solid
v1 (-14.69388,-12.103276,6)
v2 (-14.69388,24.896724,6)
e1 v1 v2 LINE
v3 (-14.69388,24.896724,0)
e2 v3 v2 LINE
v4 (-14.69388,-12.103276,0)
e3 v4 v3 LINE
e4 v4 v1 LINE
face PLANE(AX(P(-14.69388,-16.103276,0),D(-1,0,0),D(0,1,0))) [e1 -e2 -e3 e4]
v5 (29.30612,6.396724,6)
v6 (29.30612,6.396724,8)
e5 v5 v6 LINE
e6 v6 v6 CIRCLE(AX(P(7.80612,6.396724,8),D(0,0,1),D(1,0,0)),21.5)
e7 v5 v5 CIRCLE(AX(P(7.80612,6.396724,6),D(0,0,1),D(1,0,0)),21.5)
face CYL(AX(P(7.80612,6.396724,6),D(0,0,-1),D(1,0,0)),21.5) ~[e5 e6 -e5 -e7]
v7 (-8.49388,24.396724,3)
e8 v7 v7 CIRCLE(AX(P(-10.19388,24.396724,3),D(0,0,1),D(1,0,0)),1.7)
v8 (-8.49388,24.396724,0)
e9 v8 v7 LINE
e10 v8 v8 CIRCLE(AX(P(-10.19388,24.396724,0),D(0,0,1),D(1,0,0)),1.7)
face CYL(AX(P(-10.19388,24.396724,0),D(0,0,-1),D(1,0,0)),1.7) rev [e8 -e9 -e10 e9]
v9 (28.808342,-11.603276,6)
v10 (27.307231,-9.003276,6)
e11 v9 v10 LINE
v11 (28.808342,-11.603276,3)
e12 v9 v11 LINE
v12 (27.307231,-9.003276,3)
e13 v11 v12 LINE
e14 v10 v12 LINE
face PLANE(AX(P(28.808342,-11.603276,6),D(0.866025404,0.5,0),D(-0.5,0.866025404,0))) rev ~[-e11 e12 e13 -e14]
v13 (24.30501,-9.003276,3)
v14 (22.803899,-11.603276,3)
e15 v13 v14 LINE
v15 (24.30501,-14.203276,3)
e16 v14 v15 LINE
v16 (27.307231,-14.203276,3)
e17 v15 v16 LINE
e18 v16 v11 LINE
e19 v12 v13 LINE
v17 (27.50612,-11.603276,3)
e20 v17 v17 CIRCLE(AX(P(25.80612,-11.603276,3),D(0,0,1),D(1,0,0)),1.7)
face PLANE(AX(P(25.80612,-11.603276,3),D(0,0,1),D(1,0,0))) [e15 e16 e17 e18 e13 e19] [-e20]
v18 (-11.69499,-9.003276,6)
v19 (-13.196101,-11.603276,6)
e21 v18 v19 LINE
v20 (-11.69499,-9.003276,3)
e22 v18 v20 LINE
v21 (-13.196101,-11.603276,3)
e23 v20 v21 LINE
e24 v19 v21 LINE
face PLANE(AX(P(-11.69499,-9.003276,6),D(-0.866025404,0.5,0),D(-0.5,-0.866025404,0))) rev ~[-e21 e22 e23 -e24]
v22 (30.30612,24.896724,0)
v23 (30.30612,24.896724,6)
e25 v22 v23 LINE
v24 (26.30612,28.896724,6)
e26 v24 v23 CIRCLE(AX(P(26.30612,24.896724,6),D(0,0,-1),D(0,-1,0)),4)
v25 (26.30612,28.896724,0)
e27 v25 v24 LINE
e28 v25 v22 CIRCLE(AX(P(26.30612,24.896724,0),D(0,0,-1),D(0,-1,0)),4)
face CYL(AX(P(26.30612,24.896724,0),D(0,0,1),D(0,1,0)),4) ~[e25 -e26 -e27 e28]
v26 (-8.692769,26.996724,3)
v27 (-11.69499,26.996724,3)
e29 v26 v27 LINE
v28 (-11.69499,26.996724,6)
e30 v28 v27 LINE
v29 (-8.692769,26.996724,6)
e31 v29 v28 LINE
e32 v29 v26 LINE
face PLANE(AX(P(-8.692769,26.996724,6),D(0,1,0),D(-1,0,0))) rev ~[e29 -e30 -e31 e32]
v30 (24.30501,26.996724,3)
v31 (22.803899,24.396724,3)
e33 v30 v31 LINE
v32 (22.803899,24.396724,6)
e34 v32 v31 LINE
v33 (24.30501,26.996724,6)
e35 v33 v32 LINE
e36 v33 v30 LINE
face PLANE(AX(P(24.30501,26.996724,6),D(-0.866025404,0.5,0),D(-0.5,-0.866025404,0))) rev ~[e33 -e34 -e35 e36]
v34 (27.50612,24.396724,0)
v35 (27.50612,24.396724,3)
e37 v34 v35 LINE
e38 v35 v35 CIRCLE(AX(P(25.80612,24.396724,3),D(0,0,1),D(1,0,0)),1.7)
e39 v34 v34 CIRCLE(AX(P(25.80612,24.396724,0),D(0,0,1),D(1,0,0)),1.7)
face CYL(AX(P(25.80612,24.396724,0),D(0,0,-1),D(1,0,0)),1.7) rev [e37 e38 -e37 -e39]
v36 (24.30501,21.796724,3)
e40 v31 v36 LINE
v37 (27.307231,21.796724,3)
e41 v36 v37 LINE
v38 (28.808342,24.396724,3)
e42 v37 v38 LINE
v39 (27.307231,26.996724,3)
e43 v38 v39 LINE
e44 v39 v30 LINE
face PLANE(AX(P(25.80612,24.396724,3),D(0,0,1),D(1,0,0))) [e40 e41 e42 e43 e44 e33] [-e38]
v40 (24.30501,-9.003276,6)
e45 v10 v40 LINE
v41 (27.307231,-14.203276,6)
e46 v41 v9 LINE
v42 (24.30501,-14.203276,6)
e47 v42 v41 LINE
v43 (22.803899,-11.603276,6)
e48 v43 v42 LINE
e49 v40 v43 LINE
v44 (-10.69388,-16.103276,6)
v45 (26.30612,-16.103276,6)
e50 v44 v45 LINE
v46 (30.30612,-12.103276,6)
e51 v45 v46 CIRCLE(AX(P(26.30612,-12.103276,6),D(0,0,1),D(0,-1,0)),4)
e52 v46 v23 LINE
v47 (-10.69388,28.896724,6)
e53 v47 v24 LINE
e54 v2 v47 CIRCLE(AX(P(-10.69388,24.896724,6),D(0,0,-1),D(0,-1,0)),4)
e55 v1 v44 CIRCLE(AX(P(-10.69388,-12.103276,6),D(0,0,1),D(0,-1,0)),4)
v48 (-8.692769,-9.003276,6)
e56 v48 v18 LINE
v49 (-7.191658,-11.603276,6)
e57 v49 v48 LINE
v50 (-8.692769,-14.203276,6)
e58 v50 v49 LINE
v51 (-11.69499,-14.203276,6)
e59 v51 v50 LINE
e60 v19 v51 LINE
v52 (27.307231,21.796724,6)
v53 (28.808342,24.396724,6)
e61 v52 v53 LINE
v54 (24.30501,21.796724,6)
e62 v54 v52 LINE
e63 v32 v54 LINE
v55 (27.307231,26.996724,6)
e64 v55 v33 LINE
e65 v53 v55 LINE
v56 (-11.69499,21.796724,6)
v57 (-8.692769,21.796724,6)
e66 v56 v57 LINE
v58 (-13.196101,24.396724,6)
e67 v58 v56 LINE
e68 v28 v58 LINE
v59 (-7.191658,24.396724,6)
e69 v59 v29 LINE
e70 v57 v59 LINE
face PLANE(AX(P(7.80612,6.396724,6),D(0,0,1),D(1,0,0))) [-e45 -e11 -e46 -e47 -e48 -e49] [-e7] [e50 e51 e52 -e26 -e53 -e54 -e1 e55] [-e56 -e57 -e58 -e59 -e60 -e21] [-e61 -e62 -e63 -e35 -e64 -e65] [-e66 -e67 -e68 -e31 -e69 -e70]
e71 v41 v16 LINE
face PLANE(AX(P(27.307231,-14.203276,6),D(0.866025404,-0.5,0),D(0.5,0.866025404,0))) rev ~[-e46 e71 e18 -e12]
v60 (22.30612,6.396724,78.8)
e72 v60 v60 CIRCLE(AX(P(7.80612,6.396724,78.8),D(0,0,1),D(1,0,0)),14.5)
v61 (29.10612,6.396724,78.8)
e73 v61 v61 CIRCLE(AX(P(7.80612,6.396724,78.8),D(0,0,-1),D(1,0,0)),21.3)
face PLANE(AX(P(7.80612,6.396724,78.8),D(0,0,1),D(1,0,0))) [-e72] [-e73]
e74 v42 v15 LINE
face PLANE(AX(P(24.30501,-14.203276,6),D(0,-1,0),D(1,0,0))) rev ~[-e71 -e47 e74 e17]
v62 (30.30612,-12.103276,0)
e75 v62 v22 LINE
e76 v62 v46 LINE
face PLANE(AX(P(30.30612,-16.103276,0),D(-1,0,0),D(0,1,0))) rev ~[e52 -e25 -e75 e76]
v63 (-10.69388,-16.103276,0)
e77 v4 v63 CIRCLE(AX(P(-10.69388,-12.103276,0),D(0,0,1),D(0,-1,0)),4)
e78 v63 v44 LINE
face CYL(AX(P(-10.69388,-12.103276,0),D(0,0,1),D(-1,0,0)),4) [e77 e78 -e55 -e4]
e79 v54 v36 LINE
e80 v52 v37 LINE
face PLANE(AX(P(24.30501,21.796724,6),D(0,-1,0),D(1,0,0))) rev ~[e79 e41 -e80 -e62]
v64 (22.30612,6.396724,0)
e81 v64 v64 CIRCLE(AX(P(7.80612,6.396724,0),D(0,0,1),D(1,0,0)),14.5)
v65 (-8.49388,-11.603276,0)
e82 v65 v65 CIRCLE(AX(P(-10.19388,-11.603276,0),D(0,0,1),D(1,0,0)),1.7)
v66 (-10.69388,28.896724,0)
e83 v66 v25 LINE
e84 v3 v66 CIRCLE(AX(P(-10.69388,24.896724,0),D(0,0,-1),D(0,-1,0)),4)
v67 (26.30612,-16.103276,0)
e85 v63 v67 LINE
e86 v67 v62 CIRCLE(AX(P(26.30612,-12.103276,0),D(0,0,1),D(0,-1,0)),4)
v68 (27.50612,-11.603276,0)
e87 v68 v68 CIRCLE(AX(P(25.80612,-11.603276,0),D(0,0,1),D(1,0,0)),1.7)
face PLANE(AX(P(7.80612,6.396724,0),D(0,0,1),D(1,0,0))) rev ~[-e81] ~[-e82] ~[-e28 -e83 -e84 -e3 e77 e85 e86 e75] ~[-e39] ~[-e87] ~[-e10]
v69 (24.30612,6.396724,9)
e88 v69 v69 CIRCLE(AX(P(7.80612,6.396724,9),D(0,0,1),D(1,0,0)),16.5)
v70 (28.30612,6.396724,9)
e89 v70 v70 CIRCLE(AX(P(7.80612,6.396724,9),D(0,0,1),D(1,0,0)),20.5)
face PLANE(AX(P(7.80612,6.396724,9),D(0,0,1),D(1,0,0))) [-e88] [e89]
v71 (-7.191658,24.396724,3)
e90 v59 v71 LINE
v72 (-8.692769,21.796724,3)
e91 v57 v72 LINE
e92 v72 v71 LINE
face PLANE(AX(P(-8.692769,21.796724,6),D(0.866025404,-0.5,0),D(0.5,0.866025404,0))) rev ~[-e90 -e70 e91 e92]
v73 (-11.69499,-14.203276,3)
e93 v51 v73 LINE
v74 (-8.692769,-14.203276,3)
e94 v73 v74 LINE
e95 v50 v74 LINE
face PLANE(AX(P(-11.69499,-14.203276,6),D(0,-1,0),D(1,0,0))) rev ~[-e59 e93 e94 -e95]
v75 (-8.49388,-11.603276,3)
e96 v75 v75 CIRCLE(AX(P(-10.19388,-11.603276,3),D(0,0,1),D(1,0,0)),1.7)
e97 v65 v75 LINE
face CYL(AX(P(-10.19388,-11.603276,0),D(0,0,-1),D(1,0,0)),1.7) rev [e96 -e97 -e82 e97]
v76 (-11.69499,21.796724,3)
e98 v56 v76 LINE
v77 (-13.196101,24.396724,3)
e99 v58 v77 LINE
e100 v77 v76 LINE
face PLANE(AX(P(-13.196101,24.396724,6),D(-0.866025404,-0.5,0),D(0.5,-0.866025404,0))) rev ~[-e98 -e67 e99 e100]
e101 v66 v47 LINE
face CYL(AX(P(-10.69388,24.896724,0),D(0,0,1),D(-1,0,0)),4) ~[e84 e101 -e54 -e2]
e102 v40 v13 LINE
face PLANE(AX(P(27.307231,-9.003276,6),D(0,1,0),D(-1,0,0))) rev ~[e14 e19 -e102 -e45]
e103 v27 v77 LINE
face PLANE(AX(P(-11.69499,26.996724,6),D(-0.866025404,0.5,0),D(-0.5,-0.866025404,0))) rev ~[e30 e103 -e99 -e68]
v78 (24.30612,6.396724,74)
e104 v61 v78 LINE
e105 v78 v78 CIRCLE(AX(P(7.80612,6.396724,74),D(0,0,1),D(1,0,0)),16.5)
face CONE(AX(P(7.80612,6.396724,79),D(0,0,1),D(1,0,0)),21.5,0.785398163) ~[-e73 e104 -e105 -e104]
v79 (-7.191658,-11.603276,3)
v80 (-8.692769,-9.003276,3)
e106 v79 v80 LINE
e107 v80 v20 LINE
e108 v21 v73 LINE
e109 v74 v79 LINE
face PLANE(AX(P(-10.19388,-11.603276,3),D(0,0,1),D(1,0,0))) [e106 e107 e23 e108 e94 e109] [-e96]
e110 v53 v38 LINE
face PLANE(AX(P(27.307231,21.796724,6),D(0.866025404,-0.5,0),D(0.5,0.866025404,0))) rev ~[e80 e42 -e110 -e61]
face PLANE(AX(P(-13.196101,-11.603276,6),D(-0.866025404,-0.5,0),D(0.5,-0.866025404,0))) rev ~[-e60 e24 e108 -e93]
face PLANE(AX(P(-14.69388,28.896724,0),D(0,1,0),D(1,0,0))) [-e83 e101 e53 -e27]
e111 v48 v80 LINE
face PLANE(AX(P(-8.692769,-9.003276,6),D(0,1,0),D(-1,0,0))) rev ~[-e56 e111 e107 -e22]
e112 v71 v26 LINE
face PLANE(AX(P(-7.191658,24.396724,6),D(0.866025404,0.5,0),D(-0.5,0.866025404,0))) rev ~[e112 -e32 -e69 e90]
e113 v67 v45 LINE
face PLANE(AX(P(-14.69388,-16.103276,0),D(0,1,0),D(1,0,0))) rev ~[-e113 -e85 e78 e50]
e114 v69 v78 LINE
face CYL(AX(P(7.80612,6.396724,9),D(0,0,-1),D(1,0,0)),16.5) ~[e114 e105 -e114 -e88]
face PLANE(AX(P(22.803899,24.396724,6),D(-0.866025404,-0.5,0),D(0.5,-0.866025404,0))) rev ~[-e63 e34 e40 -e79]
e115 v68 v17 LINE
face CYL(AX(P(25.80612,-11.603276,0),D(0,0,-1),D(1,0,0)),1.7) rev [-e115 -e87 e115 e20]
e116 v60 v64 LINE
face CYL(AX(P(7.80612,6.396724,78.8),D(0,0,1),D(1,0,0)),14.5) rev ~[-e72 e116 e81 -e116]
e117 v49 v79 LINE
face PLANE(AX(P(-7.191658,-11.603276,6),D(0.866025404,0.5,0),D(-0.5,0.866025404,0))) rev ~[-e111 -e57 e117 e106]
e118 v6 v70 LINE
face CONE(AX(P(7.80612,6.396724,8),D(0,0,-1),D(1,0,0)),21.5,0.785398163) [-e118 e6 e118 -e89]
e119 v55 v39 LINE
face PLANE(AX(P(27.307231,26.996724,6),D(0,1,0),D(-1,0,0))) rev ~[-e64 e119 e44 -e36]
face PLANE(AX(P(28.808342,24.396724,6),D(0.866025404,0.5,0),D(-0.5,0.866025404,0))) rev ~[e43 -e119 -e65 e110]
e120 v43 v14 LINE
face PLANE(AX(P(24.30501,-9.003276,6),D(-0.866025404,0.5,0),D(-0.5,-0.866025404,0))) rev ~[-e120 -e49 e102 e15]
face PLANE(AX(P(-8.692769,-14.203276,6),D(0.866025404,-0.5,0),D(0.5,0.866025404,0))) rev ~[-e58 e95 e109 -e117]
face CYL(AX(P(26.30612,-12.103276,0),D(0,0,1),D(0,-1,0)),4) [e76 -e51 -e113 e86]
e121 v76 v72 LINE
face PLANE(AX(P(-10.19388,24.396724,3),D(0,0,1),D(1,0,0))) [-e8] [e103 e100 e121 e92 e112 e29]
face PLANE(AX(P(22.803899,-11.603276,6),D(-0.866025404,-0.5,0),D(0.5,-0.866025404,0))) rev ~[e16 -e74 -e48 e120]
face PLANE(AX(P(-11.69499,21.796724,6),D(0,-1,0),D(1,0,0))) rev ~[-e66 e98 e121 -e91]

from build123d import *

# Parameters (mm, degrees)
F0_W         = 45
F0_H         = 45
F0_R         = 1.7
F1_DEPTH     = 6
F2_R         = 1.7
F3_DEPTH     = 3
F4_R         = 4
F5_R         = 21.5
F6_DEPTH     = 3
F7_SIZE      = 1
F8_R         = 16.5
F9_DEPTH     = 65
F10_R        = 21.5
F11_DEPTH    = 4.8
F12_S5_R     = 16.5
F12_T6_DEPTH = 32
F13_R        = 14.5
F14_DEPTH    = 100


# Not quite as in the source:
# - a fillet or chamfer that OpenCascade refuses, or shapes differently, is made with other operations: its cross-section is extruded or revolved along the edge and cut away or added


with BuildPart() as f1:
    # F0 (on Top) → F1 (new body)
    with BuildSketch(Plane.XY):
        with Locations((7.8061202839, 6.3967237547)):
            Rectangle(F0_W, F0_H)
        with Locations((-10.1938797161, -11.6032762453)):
            Circle(F0_R, mode=Mode.SUBTRACT)
        with Locations((25.8061202839, -11.6032762453)):
            Circle(F0_R, mode=Mode.SUBTRACT)
        with Locations((-10.1938797161, 24.3967237547)):
            Circle(F0_R, mode=Mode.SUBTRACT)
        with Locations((25.8061202839, 24.3967237547)):
            Circle(F0_R, mode=Mode.SUBTRACT)
    extrude(amount=F1_DEPTH)

    # F2 (on face) → F3 (cut)
    with BuildSketch(Plane.XY.offset(6)):
        Polygon((-11.694990416, 21.7967237547), (-8.6927690162, 21.7967237547), (-7.1916583163, 24.3967237547), (-8.6927690162, 26.9967237547), (-11.694990416, 26.9967237547), (-13.1961011159, 24.3967237547), align=None)
        with Locations((-10.1938797161, 24.3967237547)):
            Circle(F2_R, mode=Mode.SUBTRACT)
        Polygon((24.305009584, 21.7967237547), (27.3072309838, 21.7967237547), (28.8083416837, 24.3967237547), (27.3072309838, 26.9967237547), (24.305009584, 26.9967237547), (22.8038988841, 24.3967237547), align=None)
        with Locations((25.8061202839, 24.3967237547)):
            Circle(F2_R, mode=Mode.SUBTRACT)
        Polygon((-8.6927690162, -9.0032762453), (-11.694990416, -9.0032762453), (-13.1961011159, -11.6032762453), (-11.694990416, -14.2032762453), (-8.6927690162, -14.2032762453), (-7.1916583163, -11.6032762453), align=None)
        with Locations((-10.1938797161, -11.6032762453)):
            Circle(F2_R, mode=Mode.SUBTRACT)
        Polygon((27.3072309838, -9.0032762453), (24.305009584, -9.0032762453), (22.8038988841, -11.6032762453), (24.305009584, -14.2032762453), (27.3072309838, -14.2032762453), (28.8083416837, -11.6032762453), align=None)
        with Locations((25.8061202839, -11.6032762453)):
            Circle(F2_R, mode=Mode.SUBTRACT)
    extrude(amount=-F3_DEPTH, mode=Mode.SUBTRACT)

    # F4
    f4_edges = [f1.edges().sort_by_distance(p)[0] for p in [
        (-14.69388, 28.896724, 3),
        (30.30612, 28.896724, 3),
        (30.30612, -16.103276, 3),
        (-14.69388, -16.103276, 3),
    ]]
    fillet(f4_edges, radius=F4_R)

    # F5 (on face) → F6 (join)
    with BuildSketch(Plane.XY.offset(6)):
        with Locations((7.8061202839, 6.3967237547)):
            Circle(F5_R)
    extrude(amount=F6_DEPTH)

    # F7
    f7_edges = [f1.edges().sort_by_distance(p)[0] for p in [
        (-13.69388, 6.396724, 9),
    ]]
    chamfer(f7_edges, length=F7_SIZE)

    # F8 (on face) → F9 (join)
    with BuildSketch(Plane.XY.offset(9)):
        with Locations((7.8061202839, 6.3967237547)):
            Circle(F8_R)
    extrude(amount=F9_DEPTH)

    # F10 (on face) → F11 (join)
    with BuildSketch(Plane.XY.offset(74)):
        with Locations((7.8061202839, 6.3967237547)):
            Circle(F10_R)
    extrude(amount=F11_DEPTH)

    # F12: chamfer of 5 on 1 edges, made by hand


with BuildPart() as f12_tool2:
    # F12_s3 → F12_t4 (revolve)
    with BuildSketch(Plane.XZ.offset(-6.3967237547)):
        Polygon((29.3061202839, 79), (24.3061202839, 74), (29.3061202839, 74), align=None)
    revolve(axis=Axis((7.8061202839, 6.3967237547, 74), (0, 0, 1)))

    # F12_s5 → F12_t6 (cut, symmetric)
    with BuildSketch(Plane.XY.offset(76.5)):
        with Locations((7.8061202839, 6.3967237547)):
            Circle(F12_S5_R)
    extrude(amount=F12_T6_DEPTH, both=True, mode=Mode.SUBTRACT)


with BuildPart() as f1_1:
    add(f1.part)

    # F12_t1: cut F12_tool2
    add(f12_tool2.part, mode=Mode.SUBTRACT)

    # F13 (on face) → F14 (cut)
    with BuildSketch(Plane.XY.offset(78.8)):
        with Locations((7.8061202839, 6.3967237547)):
            Circle(F13_R)
    extrude(amount=-F14_DEPTH, mode=Mode.SUBTRACT)


solid = f1_1.part
